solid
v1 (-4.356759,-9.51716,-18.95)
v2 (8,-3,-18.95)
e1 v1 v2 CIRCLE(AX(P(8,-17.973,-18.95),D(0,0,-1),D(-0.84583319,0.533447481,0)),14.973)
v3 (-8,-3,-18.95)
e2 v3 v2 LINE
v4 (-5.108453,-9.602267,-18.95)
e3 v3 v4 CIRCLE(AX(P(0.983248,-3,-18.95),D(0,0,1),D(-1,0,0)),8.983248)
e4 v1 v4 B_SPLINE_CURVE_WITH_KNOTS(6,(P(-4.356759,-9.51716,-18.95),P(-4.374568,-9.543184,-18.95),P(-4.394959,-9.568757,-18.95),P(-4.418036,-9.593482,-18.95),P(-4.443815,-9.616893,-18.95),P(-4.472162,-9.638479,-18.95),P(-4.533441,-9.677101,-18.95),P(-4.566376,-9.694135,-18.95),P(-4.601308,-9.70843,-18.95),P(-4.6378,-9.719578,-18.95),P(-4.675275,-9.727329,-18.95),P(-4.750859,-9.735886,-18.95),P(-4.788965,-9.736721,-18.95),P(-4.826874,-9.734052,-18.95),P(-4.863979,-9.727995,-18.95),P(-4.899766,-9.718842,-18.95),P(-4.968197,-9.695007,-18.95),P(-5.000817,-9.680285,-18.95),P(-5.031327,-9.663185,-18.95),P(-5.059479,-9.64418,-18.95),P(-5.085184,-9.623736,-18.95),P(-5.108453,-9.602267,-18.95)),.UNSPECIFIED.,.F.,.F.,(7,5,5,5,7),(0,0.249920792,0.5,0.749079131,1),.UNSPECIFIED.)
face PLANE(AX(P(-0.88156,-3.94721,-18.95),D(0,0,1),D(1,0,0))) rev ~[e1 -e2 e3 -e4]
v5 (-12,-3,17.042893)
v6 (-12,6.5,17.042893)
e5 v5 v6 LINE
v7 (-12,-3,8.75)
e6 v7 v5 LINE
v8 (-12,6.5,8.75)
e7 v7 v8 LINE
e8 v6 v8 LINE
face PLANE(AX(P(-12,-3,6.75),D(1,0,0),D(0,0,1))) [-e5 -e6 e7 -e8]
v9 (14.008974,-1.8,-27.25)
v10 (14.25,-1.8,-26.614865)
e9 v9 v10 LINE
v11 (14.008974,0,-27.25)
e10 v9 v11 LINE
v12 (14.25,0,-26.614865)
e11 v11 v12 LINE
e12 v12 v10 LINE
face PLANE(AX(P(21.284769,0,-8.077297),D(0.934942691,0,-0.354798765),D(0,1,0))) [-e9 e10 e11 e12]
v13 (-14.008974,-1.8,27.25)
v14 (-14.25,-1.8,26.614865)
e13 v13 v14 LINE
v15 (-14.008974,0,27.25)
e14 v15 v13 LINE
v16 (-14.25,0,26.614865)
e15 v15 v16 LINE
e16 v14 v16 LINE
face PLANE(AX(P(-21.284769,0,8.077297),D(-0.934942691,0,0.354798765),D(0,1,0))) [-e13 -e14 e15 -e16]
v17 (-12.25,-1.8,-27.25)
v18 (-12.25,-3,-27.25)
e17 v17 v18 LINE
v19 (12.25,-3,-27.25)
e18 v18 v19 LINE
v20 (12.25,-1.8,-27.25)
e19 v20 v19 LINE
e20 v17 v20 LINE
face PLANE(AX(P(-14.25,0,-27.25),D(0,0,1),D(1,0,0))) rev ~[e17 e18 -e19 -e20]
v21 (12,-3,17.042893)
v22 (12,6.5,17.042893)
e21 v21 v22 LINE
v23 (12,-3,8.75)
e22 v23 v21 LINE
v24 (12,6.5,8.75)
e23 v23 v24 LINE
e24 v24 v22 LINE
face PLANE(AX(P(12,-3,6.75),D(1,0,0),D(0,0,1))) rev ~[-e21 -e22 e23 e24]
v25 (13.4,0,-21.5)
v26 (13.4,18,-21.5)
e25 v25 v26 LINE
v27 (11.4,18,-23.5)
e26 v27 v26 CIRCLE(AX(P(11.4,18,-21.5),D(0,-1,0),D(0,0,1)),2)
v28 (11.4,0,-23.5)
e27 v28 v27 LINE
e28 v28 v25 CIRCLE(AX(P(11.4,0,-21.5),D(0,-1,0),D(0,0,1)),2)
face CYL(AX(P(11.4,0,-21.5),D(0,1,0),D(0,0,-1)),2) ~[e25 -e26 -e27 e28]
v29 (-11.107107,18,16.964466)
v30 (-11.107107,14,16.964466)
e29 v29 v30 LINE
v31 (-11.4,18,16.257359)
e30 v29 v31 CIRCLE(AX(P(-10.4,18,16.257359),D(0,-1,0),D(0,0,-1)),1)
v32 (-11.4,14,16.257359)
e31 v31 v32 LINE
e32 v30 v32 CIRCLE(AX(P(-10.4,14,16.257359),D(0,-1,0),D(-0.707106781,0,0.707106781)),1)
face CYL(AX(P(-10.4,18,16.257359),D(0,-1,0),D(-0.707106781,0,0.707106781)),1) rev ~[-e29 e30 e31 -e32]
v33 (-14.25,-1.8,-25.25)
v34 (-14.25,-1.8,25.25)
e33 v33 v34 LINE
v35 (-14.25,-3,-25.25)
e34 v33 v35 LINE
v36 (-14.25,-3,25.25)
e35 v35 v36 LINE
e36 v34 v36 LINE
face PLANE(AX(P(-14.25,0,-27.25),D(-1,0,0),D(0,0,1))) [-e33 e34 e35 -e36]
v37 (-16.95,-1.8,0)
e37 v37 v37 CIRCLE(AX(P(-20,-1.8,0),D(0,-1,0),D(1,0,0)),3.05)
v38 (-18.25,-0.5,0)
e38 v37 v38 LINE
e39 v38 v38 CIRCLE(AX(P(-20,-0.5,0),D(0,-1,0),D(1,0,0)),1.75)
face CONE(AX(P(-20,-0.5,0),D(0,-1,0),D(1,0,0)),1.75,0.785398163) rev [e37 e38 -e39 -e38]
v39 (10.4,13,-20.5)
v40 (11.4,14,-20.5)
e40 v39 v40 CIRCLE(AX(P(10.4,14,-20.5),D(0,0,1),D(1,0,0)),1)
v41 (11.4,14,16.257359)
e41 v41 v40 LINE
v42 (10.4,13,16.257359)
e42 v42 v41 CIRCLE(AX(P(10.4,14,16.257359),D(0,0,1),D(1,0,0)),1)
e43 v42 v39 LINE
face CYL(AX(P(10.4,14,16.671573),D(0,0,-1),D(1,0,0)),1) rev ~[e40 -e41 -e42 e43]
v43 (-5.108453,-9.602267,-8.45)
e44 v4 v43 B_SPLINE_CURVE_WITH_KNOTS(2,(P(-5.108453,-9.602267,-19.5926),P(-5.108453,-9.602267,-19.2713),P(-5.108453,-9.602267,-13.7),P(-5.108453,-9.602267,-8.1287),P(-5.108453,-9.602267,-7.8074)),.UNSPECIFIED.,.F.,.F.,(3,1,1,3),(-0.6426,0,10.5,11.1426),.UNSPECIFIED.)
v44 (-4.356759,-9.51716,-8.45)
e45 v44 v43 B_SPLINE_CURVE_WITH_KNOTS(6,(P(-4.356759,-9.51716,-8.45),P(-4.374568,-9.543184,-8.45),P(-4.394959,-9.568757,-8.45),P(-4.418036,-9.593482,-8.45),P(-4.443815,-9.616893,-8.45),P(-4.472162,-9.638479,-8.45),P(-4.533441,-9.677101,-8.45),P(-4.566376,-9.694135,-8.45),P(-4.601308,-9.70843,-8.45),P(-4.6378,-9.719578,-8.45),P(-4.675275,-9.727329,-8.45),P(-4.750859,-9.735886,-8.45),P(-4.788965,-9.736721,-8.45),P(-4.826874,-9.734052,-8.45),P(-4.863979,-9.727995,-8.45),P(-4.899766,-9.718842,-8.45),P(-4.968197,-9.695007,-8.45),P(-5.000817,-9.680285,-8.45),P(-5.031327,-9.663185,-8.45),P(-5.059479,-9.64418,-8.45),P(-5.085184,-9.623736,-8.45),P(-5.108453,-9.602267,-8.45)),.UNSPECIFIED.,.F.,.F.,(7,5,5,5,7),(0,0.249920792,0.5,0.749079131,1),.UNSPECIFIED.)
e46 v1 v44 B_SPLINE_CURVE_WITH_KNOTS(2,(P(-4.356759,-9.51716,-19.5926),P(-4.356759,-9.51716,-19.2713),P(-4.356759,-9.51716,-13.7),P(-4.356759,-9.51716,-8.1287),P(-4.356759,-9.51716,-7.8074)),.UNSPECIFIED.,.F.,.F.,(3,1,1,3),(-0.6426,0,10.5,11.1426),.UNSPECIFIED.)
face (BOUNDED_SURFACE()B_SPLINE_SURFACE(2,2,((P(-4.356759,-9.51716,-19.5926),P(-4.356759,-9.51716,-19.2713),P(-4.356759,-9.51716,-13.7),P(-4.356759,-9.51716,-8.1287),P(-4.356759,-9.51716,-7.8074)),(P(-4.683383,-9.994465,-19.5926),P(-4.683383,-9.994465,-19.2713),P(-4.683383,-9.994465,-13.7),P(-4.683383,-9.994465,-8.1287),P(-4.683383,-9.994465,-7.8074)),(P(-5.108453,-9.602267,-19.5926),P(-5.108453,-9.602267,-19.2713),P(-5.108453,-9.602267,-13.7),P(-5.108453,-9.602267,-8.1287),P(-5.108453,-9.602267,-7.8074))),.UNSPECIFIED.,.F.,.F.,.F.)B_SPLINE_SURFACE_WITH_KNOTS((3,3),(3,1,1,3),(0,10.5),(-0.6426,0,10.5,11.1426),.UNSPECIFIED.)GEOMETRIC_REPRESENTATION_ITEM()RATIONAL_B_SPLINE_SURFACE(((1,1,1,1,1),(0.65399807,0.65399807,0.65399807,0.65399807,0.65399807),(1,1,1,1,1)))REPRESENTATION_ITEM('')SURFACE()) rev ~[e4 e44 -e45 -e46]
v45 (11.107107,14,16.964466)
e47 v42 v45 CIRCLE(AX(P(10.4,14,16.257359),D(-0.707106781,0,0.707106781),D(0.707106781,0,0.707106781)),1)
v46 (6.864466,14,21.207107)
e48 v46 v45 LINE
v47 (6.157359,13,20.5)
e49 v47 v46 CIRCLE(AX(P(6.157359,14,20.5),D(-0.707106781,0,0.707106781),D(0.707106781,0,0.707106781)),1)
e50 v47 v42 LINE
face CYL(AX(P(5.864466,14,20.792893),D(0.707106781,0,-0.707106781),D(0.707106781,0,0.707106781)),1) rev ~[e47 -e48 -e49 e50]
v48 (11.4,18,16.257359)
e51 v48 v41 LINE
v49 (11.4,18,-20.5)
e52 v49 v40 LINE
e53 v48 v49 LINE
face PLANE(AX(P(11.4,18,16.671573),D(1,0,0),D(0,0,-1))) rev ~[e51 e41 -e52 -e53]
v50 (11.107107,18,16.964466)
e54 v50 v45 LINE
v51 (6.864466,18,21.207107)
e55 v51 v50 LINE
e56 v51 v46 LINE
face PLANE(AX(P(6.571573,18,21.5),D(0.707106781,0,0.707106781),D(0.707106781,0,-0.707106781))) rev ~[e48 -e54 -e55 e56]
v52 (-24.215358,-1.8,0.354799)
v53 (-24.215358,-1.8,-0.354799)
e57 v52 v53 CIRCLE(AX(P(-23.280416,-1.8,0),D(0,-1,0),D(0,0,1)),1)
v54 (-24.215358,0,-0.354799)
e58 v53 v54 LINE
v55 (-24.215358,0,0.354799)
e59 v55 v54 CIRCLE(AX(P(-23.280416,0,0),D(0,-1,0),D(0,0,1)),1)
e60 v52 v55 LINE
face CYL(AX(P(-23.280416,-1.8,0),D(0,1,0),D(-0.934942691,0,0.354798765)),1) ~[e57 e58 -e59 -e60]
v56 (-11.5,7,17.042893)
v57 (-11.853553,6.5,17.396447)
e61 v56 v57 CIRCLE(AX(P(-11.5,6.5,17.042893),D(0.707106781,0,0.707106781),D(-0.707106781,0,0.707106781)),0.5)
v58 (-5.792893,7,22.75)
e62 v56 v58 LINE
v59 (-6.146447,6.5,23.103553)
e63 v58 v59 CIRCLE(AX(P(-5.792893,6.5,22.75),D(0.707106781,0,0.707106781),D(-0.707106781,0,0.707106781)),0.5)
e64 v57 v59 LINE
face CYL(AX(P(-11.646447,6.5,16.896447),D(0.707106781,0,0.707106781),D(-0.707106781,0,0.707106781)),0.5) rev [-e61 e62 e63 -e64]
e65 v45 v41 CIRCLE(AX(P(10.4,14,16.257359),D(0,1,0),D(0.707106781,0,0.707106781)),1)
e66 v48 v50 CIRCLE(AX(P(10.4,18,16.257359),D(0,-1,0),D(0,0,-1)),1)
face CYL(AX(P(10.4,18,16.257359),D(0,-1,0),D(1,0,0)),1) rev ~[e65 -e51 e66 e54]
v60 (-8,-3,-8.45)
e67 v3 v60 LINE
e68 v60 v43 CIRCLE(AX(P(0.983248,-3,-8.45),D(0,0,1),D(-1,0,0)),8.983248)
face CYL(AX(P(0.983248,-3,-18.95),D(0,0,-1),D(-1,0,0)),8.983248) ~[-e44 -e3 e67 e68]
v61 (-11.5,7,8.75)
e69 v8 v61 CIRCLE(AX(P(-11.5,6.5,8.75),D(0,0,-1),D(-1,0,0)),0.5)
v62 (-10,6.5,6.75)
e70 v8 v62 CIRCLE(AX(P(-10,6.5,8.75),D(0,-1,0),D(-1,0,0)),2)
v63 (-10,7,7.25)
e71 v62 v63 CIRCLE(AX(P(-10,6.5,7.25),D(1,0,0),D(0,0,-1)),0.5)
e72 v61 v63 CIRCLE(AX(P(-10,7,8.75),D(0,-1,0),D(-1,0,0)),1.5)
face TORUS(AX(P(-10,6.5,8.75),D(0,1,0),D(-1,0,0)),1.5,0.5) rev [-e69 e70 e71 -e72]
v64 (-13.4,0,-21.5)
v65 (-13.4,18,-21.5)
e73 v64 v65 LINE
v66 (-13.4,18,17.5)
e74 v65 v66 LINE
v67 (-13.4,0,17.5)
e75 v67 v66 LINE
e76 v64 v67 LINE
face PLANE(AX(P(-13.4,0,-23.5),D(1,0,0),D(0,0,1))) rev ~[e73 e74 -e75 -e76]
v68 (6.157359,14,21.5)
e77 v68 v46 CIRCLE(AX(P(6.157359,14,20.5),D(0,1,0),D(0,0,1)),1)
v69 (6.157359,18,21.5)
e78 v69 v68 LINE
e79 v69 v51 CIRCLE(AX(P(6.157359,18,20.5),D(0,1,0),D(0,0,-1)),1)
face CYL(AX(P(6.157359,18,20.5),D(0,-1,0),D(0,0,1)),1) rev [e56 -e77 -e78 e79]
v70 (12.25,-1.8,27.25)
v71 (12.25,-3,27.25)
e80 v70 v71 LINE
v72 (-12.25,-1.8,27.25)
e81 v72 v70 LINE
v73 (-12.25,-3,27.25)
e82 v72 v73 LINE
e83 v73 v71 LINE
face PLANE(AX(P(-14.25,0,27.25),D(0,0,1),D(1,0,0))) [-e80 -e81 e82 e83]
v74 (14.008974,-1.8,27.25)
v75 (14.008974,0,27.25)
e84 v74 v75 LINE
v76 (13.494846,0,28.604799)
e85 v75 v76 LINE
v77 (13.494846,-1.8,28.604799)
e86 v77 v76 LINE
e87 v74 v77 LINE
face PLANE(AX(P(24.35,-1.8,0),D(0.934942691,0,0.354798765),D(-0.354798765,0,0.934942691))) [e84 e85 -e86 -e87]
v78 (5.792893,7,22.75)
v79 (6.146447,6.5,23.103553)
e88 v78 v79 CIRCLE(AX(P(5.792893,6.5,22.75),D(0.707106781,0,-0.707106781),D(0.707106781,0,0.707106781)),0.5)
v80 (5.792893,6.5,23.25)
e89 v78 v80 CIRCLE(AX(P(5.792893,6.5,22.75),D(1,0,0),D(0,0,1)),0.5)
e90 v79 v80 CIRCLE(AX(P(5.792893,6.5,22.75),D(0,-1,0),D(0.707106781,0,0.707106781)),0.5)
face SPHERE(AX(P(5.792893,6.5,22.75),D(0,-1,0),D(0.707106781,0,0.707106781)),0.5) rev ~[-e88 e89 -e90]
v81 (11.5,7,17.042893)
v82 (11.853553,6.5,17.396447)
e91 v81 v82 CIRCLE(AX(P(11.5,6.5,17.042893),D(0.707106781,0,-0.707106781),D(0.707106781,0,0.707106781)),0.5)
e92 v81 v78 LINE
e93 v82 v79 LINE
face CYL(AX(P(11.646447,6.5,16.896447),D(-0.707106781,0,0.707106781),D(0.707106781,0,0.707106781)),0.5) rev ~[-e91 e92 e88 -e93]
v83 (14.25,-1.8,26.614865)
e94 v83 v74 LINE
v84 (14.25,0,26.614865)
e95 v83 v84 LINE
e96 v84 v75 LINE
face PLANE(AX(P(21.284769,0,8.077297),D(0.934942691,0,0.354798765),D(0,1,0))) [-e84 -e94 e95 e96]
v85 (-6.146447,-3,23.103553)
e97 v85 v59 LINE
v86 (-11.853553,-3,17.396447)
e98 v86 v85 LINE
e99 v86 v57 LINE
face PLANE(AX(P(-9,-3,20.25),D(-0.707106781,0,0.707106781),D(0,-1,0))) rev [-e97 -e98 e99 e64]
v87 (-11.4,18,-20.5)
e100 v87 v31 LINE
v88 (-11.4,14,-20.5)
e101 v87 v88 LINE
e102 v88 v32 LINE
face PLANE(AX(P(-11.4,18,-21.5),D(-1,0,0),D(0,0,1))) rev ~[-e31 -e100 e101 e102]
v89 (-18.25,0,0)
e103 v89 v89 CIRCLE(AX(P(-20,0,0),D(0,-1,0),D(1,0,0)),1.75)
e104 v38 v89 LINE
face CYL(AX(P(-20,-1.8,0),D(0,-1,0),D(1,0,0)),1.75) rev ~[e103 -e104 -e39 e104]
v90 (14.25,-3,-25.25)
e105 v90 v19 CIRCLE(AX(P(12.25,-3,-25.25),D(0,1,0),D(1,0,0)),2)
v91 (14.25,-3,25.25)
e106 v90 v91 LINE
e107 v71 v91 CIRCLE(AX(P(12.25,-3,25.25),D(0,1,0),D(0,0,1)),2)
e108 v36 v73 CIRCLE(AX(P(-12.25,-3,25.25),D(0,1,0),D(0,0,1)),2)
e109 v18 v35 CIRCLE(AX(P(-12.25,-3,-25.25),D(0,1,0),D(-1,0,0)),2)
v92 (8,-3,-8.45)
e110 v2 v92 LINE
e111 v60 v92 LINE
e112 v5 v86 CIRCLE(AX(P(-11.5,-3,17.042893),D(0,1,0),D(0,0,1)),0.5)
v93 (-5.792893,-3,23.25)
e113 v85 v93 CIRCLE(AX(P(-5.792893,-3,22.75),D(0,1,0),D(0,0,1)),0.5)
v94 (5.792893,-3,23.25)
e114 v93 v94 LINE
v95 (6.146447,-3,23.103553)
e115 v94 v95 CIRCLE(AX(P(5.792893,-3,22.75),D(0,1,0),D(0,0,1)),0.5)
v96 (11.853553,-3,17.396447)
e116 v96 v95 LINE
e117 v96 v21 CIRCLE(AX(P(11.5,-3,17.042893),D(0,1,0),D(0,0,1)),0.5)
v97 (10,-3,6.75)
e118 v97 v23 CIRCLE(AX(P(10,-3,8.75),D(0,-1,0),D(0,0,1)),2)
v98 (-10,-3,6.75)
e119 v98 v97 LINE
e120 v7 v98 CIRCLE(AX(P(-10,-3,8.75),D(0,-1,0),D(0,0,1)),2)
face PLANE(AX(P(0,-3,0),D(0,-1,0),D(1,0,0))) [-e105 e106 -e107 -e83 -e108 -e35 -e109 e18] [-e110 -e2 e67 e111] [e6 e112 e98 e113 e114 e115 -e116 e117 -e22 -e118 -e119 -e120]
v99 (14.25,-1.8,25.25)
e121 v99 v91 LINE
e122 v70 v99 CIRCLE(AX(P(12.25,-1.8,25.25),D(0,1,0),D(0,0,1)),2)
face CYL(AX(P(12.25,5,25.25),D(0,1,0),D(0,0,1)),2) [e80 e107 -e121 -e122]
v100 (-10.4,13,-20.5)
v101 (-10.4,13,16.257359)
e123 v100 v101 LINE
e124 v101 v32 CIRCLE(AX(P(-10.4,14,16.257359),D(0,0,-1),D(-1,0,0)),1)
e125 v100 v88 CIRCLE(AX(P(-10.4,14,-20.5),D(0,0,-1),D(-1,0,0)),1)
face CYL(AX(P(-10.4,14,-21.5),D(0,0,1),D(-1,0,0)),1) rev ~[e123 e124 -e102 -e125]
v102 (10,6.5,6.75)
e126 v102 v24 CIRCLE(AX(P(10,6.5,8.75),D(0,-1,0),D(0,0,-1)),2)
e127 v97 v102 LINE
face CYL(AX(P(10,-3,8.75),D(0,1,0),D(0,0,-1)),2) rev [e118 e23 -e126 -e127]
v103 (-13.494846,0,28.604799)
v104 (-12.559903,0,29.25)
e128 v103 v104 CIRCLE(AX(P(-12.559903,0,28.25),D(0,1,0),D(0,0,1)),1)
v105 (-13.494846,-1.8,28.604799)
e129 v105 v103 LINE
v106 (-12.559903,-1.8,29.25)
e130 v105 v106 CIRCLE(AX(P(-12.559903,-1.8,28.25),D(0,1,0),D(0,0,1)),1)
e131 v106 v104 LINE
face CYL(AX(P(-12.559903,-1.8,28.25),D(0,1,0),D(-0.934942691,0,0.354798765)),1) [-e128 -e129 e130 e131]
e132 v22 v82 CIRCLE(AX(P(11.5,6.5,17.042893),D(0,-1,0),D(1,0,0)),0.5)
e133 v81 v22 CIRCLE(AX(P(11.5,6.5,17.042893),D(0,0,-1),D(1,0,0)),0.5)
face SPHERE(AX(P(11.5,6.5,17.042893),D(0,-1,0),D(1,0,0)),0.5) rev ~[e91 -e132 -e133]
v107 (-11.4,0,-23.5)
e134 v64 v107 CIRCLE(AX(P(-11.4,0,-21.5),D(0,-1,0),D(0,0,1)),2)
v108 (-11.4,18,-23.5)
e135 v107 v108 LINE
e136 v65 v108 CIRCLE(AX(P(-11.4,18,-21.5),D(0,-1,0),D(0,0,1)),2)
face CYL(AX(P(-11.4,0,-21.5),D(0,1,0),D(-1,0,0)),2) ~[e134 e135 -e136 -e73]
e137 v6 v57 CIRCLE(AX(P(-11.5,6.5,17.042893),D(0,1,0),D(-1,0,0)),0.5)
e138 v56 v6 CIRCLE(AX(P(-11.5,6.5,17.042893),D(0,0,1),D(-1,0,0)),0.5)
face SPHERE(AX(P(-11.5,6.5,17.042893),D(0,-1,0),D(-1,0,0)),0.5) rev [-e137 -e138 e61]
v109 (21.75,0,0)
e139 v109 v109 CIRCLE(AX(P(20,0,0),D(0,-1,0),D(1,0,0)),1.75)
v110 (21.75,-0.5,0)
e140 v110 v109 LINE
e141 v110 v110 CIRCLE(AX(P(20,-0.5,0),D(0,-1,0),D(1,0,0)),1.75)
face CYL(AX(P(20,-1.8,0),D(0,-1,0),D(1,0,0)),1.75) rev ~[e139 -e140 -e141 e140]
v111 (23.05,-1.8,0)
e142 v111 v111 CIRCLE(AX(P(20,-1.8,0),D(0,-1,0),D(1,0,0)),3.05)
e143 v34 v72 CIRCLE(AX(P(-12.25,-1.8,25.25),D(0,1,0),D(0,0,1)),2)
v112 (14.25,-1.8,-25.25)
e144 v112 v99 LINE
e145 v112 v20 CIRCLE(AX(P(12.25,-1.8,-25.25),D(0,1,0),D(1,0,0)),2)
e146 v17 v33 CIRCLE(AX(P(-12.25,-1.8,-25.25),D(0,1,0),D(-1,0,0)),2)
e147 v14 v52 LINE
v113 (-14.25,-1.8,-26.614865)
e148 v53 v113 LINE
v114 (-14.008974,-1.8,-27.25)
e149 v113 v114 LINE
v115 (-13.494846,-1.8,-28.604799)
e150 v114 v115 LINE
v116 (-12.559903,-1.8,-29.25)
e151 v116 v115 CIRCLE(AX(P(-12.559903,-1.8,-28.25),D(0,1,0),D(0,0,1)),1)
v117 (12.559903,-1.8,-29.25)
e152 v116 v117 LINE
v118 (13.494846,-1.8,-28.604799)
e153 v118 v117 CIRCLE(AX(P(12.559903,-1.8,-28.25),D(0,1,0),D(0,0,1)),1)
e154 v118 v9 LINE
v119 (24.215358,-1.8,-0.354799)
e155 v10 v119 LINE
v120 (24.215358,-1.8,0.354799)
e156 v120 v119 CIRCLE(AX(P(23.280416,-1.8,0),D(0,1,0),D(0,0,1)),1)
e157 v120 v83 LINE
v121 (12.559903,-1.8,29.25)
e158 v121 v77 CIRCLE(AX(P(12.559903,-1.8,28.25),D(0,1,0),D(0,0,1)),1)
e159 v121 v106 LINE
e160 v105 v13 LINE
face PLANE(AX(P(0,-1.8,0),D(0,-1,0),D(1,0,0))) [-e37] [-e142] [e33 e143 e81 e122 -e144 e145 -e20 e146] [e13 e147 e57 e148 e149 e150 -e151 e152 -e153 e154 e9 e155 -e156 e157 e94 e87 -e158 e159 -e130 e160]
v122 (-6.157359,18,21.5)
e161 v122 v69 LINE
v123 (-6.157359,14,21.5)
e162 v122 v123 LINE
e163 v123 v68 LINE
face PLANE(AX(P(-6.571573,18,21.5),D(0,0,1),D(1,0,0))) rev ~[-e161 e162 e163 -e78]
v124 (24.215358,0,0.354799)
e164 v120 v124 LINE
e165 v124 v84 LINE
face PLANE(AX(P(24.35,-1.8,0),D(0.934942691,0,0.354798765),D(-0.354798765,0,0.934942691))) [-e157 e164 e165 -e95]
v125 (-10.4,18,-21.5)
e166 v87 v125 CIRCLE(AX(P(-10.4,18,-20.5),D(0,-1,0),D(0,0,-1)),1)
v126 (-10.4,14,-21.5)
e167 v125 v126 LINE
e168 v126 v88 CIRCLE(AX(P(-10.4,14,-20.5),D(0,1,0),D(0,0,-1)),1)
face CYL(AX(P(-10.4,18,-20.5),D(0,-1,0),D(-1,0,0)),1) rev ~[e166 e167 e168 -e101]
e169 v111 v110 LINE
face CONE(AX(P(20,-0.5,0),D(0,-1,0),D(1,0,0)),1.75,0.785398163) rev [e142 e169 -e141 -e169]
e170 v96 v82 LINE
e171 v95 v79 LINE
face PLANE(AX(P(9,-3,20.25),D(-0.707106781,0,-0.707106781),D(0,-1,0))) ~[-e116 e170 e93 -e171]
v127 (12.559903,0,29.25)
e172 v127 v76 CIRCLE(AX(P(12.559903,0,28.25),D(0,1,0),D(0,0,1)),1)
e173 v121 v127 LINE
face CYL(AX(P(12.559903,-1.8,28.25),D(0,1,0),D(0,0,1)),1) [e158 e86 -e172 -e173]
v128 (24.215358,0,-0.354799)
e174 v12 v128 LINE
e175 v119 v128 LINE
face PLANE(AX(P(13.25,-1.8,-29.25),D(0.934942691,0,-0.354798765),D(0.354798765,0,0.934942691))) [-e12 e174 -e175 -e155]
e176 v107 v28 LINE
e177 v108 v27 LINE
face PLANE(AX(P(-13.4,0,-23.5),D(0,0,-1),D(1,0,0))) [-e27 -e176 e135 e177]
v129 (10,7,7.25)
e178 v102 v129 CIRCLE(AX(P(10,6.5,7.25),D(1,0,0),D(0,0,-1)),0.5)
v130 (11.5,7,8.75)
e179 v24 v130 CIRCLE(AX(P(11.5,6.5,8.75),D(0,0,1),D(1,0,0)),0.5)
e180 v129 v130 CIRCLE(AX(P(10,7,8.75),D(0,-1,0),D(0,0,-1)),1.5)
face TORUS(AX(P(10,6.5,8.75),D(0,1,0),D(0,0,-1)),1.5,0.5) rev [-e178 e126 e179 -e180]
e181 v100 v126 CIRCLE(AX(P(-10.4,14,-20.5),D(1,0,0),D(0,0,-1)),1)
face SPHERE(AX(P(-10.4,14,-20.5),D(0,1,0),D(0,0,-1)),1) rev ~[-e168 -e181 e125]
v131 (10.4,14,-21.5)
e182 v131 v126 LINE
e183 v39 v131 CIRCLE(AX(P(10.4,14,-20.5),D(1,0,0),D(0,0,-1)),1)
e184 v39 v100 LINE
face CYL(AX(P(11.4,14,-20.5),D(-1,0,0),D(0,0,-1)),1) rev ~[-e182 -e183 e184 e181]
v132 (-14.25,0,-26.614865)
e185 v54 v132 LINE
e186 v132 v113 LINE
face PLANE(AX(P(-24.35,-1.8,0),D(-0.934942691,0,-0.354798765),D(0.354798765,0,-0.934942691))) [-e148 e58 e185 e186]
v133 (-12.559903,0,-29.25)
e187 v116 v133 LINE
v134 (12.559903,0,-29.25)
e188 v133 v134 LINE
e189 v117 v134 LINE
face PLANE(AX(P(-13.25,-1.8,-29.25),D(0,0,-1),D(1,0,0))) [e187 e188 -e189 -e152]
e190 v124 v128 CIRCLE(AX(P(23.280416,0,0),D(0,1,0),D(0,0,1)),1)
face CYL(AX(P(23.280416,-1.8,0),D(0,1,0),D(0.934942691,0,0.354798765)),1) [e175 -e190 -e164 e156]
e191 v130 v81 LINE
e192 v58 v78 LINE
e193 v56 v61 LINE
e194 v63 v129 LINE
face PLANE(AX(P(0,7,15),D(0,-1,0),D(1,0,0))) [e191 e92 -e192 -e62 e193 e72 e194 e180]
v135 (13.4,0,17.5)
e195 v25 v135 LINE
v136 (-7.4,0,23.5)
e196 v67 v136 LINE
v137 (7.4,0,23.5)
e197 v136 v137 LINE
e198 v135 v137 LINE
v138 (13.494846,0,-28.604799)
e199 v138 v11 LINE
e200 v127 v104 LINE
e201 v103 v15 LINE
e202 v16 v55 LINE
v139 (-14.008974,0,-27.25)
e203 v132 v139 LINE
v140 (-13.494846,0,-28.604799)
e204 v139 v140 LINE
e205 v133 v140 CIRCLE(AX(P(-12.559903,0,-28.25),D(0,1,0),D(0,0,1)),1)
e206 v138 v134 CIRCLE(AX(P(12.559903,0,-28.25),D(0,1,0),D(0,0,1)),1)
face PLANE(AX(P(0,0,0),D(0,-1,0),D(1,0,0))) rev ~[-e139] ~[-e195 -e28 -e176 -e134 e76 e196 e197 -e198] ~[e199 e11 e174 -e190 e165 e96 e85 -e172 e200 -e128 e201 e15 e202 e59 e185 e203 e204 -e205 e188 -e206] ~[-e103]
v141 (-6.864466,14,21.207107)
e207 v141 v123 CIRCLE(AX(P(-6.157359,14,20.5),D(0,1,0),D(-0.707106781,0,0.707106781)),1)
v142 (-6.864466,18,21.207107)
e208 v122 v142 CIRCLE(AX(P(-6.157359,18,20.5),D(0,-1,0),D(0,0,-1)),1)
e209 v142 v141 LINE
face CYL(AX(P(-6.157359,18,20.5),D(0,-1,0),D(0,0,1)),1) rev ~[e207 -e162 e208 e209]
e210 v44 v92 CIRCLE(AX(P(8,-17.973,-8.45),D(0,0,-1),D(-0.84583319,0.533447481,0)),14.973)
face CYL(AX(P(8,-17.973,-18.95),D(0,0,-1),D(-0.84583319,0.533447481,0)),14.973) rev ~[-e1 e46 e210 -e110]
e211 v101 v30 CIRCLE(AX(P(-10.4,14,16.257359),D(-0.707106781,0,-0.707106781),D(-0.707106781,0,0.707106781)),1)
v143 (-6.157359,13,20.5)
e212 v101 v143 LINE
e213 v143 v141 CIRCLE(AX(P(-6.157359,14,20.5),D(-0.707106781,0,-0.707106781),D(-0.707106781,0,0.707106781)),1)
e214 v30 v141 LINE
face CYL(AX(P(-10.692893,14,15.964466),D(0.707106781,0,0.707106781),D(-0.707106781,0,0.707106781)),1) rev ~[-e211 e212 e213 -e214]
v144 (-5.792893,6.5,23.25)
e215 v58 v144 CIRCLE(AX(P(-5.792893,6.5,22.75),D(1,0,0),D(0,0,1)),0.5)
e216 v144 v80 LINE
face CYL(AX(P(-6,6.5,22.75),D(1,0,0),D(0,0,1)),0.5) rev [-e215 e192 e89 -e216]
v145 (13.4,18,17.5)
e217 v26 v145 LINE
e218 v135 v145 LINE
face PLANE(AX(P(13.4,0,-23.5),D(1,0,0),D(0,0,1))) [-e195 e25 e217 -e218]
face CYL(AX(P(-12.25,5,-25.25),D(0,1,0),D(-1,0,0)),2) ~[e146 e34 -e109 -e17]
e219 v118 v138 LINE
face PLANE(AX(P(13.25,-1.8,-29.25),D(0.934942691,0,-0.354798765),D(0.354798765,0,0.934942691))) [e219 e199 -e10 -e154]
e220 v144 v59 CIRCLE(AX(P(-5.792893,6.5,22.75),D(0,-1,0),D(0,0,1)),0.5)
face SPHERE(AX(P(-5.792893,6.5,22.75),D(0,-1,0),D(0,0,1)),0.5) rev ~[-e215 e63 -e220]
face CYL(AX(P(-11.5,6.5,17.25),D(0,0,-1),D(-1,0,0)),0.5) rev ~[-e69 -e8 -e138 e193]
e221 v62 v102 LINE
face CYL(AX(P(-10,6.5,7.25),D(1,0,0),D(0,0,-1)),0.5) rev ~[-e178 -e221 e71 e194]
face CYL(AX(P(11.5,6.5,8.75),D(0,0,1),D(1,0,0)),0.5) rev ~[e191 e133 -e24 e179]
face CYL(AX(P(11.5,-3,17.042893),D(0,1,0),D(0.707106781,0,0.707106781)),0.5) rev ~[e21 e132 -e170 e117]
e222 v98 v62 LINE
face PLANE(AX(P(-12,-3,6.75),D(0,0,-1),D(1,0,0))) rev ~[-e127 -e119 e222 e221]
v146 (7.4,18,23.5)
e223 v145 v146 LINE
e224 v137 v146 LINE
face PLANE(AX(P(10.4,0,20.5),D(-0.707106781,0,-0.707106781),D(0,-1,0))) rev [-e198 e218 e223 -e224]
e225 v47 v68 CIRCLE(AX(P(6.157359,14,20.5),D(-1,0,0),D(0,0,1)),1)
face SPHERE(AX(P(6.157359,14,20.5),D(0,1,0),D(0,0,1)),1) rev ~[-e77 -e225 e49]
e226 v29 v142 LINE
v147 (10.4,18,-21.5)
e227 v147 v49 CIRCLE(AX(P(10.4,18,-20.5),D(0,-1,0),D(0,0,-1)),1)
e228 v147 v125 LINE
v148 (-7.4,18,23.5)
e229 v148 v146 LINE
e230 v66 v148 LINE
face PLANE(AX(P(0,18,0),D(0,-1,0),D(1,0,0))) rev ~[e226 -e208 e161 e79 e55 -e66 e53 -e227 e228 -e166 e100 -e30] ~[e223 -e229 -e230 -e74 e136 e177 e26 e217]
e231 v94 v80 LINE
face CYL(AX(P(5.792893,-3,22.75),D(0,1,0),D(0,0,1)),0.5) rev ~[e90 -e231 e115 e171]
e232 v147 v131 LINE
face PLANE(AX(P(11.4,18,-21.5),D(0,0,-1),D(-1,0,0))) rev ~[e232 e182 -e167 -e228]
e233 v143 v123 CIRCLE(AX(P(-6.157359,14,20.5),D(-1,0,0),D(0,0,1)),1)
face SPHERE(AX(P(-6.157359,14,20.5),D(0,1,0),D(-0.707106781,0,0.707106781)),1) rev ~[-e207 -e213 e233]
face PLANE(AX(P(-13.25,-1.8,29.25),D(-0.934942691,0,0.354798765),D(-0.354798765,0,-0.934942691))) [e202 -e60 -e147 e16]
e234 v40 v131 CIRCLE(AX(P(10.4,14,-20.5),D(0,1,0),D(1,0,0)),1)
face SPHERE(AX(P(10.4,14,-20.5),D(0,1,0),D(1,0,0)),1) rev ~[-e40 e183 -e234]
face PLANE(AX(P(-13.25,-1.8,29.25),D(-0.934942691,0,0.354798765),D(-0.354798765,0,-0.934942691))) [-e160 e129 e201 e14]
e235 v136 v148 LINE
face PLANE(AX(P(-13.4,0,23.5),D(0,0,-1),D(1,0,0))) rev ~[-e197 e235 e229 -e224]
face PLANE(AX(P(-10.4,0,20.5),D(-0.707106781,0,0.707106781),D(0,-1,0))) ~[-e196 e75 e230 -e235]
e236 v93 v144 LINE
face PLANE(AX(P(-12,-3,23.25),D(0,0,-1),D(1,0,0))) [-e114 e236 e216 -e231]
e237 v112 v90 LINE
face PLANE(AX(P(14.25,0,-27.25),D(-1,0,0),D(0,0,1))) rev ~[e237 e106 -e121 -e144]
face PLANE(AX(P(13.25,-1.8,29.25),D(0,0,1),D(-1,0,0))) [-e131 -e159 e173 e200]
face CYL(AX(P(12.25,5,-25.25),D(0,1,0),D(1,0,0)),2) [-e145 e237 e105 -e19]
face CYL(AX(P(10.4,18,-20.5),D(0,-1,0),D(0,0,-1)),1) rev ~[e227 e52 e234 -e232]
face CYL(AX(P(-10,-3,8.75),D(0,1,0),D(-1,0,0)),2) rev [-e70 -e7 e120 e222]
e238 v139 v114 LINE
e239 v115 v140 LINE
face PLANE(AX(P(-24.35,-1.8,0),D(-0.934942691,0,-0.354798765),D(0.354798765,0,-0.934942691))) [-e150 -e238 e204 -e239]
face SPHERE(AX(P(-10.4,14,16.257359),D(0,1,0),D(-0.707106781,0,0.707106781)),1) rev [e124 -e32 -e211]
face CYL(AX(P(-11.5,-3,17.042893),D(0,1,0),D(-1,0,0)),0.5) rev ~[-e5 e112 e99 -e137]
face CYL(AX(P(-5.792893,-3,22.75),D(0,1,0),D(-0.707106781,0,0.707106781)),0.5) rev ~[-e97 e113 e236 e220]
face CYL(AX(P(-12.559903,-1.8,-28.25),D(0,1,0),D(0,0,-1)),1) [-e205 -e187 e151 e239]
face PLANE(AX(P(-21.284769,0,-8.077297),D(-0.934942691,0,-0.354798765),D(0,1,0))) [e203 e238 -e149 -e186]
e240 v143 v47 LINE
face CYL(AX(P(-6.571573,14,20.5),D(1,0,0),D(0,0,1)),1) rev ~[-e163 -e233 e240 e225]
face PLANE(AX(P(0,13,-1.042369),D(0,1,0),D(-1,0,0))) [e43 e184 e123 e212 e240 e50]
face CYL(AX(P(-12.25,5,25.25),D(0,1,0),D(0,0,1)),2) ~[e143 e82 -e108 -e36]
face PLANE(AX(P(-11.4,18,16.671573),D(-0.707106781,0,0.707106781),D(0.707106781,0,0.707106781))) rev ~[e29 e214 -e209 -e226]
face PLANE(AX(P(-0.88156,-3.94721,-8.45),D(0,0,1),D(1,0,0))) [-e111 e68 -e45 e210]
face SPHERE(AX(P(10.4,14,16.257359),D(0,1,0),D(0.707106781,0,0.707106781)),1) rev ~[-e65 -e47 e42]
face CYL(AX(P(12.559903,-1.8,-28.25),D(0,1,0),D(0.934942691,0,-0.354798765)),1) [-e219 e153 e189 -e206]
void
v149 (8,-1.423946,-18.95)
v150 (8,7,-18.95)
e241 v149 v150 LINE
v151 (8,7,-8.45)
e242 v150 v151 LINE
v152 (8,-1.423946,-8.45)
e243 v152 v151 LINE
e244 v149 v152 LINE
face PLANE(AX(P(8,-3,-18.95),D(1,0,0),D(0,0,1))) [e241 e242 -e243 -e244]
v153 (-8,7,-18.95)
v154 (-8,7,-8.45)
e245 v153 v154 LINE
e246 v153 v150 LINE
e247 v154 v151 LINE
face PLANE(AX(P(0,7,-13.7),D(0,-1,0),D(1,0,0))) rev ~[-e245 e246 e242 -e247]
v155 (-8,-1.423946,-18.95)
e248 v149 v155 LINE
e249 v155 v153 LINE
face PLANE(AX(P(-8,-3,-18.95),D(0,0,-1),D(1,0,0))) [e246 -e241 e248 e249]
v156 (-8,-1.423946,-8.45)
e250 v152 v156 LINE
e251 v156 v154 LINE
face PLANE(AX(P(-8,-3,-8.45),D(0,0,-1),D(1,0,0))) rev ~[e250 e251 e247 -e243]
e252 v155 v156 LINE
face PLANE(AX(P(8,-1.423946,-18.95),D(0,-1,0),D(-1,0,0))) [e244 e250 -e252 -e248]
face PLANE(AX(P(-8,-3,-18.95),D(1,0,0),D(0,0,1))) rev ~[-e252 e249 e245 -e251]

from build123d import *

# Parameters (mm, degrees)
F0_W          = 26.8
F0_H          = 47
F1_DEPTH      = 18
F2_SIZE       = 6
F3_R          = 2
F5_DEPTH      = 5
F6_R          = 1
F7_W          = 28.5
F7_H          = 54.5
F8_DEPTH      = 3
F10_R         = 1.75
F11_DEPTH     = 1.8
F12_T4_DEPTH  = 13
F12_T9_DEPTH  = 13
F12_T14_DEPTH = 13
F12_T19_DEPTH = 13
F12_T24_DEPTH = 13
F12_T29_DEPTH = 13
F12_T34_DEPTH = 13
F12_T39_DEPTH = 13
F13_R         = 1
F14_SIZE      = 1.3
F15_W         = 24
F15_H         = 16.5
F16_DEPTH     = 10
F17_SIZE      = 6
F19_R         = 2
F20_R         = 0.5
F21_W         = 16
F21_H         = 10.5
F22_DEPTH     = 10
F24_DEPTH     = 10.5
F25_R         = 0.5


# Not quite as in the source:
# - a fillet or chamfer that OpenCascade refuses, or shapes differently, is made with other operations: its cross-section is extruded or revolved along the edge and cut away or added


with BuildPart() as f1:
    # F0 (on Front) → F1 (new body)
    with BuildSketch(Plane.XZ):
        Rectangle(F0_W, F0_H)
    extrude(amount=-F1_DEPTH)

    # F2
    f2_edges = [f1.edges().sort_by_distance(p)[0] for p in [
        (-13.4, 9, 23.5),
        (13.4, 9, 23.5),
    ]]
    chamfer(f2_edges, length=F2_SIZE)

    # F3
    f3_edges = [f1.edges().sort_by_distance(p)[0] for p in [
        (-13.4, 9, -23.5),
        (13.4, 9, -23.5),
    ]]
    fillet(f3_edges, radius=F3_R)

    # F4 (on face) → F5 (cut)
    with BuildSketch(Plane(origin=(0, 18, 0), x_dir=(-1, 0, 0), z_dir=(0, 1, 0))):
        Polygon((-6.5715728753, 21.5), (-11.4, 16.6715728753), (-11.4, -21.5), (11.4, -21.5), (11.4, 16.6715728753), (6.5715728753, 21.5), align=None)
    extrude(amount=-F5_DEPTH, mode=Mode.SUBTRACT)

    # F6
    f6_edges = [f1.edges().sort_by_distance(p)[0] for p in [
        (-11.4, 15.5, -21.5),
        (-11.4, 15.5, 16.671573),
        (-6.571573, 15.5, 21.5),
        (6.571573, 15.5, 21.5),
        (11.4, 15.5, 16.671573),
        (11.4, 15.5, -21.5),
        (-8.985786, 13, 19.085786),
        (0, 13, 21.5),
        (8.985786, 13, 19.085786),
        (11.4, 13, -2.414214),
        (0, 13, -21.5),
        (-11.4, 13, -2.414214),
    ]]
    fillet(f6_edges, radius=F6_R)

    # F7 (on face) → F8 (join)
    with BuildSketch(Plane.XZ):
        Rectangle(F7_W, F7_H)
    extrude(amount=F8_DEPTH)

    # F10 (on offset) → F11 (join)
    with BuildSketch(Plane.XZ.offset(1.8)):
        Polygon((24.35, 0), (13.25, 29.25), (-13.25, 29.25), (-24.35, 0), (-13.25, -29.25), (13.25, -29.25), align=None)
        with Locations((-20, 0)):
            Circle(F10_R, mode=Mode.SUBTRACT)
        with Locations((20, 0)):
            Circle(F10_R, mode=Mode.SUBTRACT)
    extrude(amount=-F11_DEPTH)

    # F12: fillet of radius 2 on 4 edges, made by hand


with BuildPart() as f12_tool2:
    # F12_s3 → F12_t4 (new body)
    with BuildSketch(Plane.XZ.offset(-5)):
        with BuildLine():
            ThreePointArc((12.25, 27.25), (13.6642135624, 26.6642135624), (14.25, 25.25))
            Line((14.25, 25.25), (14.25, 27.25))
            Line((14.25, 27.25), (12.25, 27.25))
        make_face()
    extrude(amount=F12_T4_DEPTH)

    split(bisect_by=Plane.XZ.offset(1.8), keep=Keep.TOP)


with BuildPart() as f1_1:
    add(f1.part)

    # F12_t1: cut F12_tool2
    add(f12_tool2.part, mode=Mode.SUBTRACT)


with BuildPart() as f12_tool7:
    # F12_s8 → F12_t9 (new body)
    with BuildSketch(Plane.XZ.offset(-5)):
        with BuildLine():
            ThreePointArc((12.25, 27.25), (13.6642135624, 26.6642135624), (14.25, 25.25))
            Line((14.25, 25.25), (14.25, 27.25))
            Line((14.25, 27.25), (12.25, 27.25))
        make_face()
    extrude(amount=F12_T9_DEPTH)

    split(bisect_by=Plane(origin=(21.2847693156, 0, 8.0772970736), x_dir=(0, 1, 0), z_dir=(0.9349426915, 0, 0.354798765)), keep=Keep.TOP)


with BuildPart() as f1_2:
    add(f1_1.part)

    # F12_t6: cut F12_tool7
    add(f12_tool7.part, mode=Mode.SUBTRACT)


with BuildPart() as f12_tool12:
    # F12_s13 → F12_t14 (new body)
    with BuildSketch(Plane.XZ.offset(-5)):
        with BuildLine():
            ThreePointArc((-12.25, 27.25), (-13.6642135624, 26.6642135624), (-14.25, 25.25))
            Line((-14.25, 25.25), (-14.25, 27.25))
            Line((-14.25, 27.25), (-12.25, 27.25))
        make_face()
    extrude(amount=F12_T14_DEPTH)

    split(bisect_by=Plane.XZ.offset(1.8), keep=Keep.TOP)


with BuildPart() as f1_3:
    add(f1_2.part)

    # F12_t11: cut F12_tool12
    add(f12_tool12.part, mode=Mode.SUBTRACT)


with BuildPart() as f12_tool17:
    # F12_s18 → F12_t19 (new body)
    with BuildSketch(Plane.XZ.offset(-5)):
        with BuildLine():
            ThreePointArc((-12.25, 27.25), (-13.6642135624, 26.6642135624), (-14.25, 25.25))
            Line((-14.25, 25.25), (-14.25, 27.25))
            Line((-14.25, 27.25), (-12.25, 27.25))
        make_face()
    extrude(amount=F12_T19_DEPTH)

    split(bisect_by=Plane(origin=(-21.2847693156, 0, 8.0772970736), x_dir=(0, 1, 0), z_dir=(-0.9349426915, 0, 0.354798765)), keep=Keep.TOP)


with BuildPart() as f1_4:
    add(f1_3.part)

    # F12_t16: cut F12_tool17
    add(f12_tool17.part, mode=Mode.SUBTRACT)


with BuildPart() as f12_tool22:
    # F12_s23 → F12_t24 (new body)
    with BuildSketch(Plane.XZ.offset(-5)):
        with BuildLine():
            ThreePointArc((14.25, -25.25), (13.6642135624, -26.6642135624), (12.25, -27.25))
            Line((12.25, -27.25), (14.25, -27.25))
            Line((14.25, -27.25), (14.25, -25.25))
        make_face()
    extrude(amount=F12_T24_DEPTH)

    split(bisect_by=Plane.XZ.offset(1.8), keep=Keep.TOP)


with BuildPart() as f1_5:
    add(f1_4.part)

    # F12_t21: cut F12_tool22
    add(f12_tool22.part, mode=Mode.SUBTRACT)


with BuildPart() as f12_tool27:
    # F12_s28 → F12_t29 (new body)
    with BuildSketch(Plane.XZ.offset(-5)):
        with BuildLine():
            ThreePointArc((14.25, -25.25), (13.6642135624, -26.6642135624), (12.25, -27.25))
            Line((12.25, -27.25), (14.25, -27.25))
            Line((14.25, -27.25), (14.25, -25.25))
        make_face()
    extrude(amount=F12_T29_DEPTH)

    split(bisect_by=Plane(origin=(21.2847693156, 0, -8.0772970736), x_dir=(0, 1, 0), z_dir=(0.9349426915, 0, -0.354798765)), keep=Keep.TOP)


with BuildPart() as f1_6:
    add(f1_5.part)

    # F12_t26: cut F12_tool27
    add(f12_tool27.part, mode=Mode.SUBTRACT)


with BuildPart() as f12_tool32:
    # F12_s33 → F12_t34 (new body)
    with BuildSketch(Plane.XZ.offset(-5)):
        with BuildLine():
            ThreePointArc((-14.25, -25.25), (-13.6642135624, -26.6642135624), (-12.25, -27.25))
            Line((-12.25, -27.25), (-14.25, -27.25))
            Line((-14.25, -27.25), (-14.25, -25.25))
        make_face()
    extrude(amount=F12_T34_DEPTH)

    split(bisect_by=Plane.XZ.offset(1.8), keep=Keep.TOP)


with BuildPart() as f1_7:
    add(f1_6.part)

    # F12_t31: cut F12_tool32
    add(f12_tool32.part, mode=Mode.SUBTRACT)


with BuildPart() as f12_tool37:
    # F12_s38 → F12_t39 (new body)
    with BuildSketch(Plane.XZ.offset(-5)):
        with BuildLine():
            ThreePointArc((-14.25, -25.25), (-13.6642135624, -26.6642135624), (-12.25, -27.25))
            Line((-12.25, -27.25), (-14.25, -27.25))
            Line((-14.25, -27.25), (-14.25, -25.25))
        make_face()
    extrude(amount=F12_T39_DEPTH)

    split(bisect_by=Plane(origin=(-21.2847693156, 0, -8.0772970736), x_dir=(0, 1, 0), z_dir=(-0.9349426915, 0, -0.354798765)), keep=Keep.TOP)


with BuildPart() as f1_8:
    add(f1_7.part)

    # F12_t36: cut F12_tool37
    add(f12_tool37.part, mode=Mode.SUBTRACT)

    # F13
    f13_edges = [f1_8.edges().sort_by_distance(p)[0] for p in [
        (-13.25, -0.9, 29.25),
        (13.25, -0.9, 29.25),
        (-24.35, -0.9, 0),
        (-13.25, -0.9, -29.25),
        (13.25, -0.9, -29.25),
        (24.35, -0.9, 0),
    ]]
    fillet(f13_edges, radius=F13_R)

    # F14
    f14_edges = [f1_8.edges().sort_by_distance(p)[0] for p in [
        (-21.75, -1.8, 0),
        (18.25, -1.8, 0),
    ]]
    chamfer(f14_edges, length=F14_SIZE)


with BuildPart() as f16:
    # F15 (on face) → F16 (new body)
    with BuildSketch(Plane.XZ.offset(3)):
        with Locations((0, 15)):
            Rectangle(F15_W, F15_H)
    extrude(amount=-F16_DEPTH)

    # F17
    f17_edges = [f16.edges().sort_by_distance(p)[0] for p in [
        (12, 2, 23.25),
        (-12, 2, 23.25),
    ]]
    chamfer(f17_edges, length=F17_SIZE)


with BuildPart() as f1_9:
    add(f1_8.part)

    # F18: cut F16
    add(f16.part, mode=Mode.SUBTRACT)

    # F19
    f19_edges = [f1_9.edges().sort_by_distance(p)[0] for p in [
        (-12, 2, 6.75),
        (12, 2, 6.75),
    ]]
    fillet(f19_edges, radius=F19_R)

    # F20
    f20_edges = [f1_9.edges().sort_by_distance(p)[0] for p in [
        (12, 2, 17.25),
        (6, 2, 23.25),
        (-12, 2, 17.25),
        (-6, 2, 23.25),
        (12, 7, 13),
        (11.414214, 7, 7.335786),
        (9, 7, 20.25),
        (0, 7, 6.75),
        (0, 7, 23.25),
        (-11.414214, 7, 7.335786),
        (-9, 7, 20.25),
        (-12, 7, 13),
    ]]
    fillet(f20_edges, radius=F20_R)

    # F21 (on face) → F22 (cut)
    with BuildSketch(Plane.XZ.offset(3)):
        with Locations((0, -13.7)):
            Rectangle(F21_W, F21_H)
    extrude(amount=-F22_DEPTH, mode=Mode.SUBTRACT)

    # F23 (on face) → F24 (join, through all)
    with BuildSketch(Plane.XY.offset(-18.95)):
        with BuildLine():
            ThreePointArc((-4.6646603483, -9.9856908622), (0.7682384829, -4.8622275452), (8, -3))
            Line((8, -3), (8, -1.4239461161))
            Line((8, -1.4239461161), (-8, -1.4239461161))
            Line((-8, -1.4239461161), (-8, -3))
            ThreePointArc((-8, -3), (-7.1233945241, -6.8705415453), (-4.6646603483, -9.9856908622))
        make_face()
    extrude(amount=F24_DEPTH)

    # F25
    f25_edges = [f1_9.edges().sort_by_distance(p)[0] for p in [
        (-4.66466, -9.985691, -13.7),
    ]]
    fillet(f25_edges, radius=F25_R)


solid = f1_9.part
